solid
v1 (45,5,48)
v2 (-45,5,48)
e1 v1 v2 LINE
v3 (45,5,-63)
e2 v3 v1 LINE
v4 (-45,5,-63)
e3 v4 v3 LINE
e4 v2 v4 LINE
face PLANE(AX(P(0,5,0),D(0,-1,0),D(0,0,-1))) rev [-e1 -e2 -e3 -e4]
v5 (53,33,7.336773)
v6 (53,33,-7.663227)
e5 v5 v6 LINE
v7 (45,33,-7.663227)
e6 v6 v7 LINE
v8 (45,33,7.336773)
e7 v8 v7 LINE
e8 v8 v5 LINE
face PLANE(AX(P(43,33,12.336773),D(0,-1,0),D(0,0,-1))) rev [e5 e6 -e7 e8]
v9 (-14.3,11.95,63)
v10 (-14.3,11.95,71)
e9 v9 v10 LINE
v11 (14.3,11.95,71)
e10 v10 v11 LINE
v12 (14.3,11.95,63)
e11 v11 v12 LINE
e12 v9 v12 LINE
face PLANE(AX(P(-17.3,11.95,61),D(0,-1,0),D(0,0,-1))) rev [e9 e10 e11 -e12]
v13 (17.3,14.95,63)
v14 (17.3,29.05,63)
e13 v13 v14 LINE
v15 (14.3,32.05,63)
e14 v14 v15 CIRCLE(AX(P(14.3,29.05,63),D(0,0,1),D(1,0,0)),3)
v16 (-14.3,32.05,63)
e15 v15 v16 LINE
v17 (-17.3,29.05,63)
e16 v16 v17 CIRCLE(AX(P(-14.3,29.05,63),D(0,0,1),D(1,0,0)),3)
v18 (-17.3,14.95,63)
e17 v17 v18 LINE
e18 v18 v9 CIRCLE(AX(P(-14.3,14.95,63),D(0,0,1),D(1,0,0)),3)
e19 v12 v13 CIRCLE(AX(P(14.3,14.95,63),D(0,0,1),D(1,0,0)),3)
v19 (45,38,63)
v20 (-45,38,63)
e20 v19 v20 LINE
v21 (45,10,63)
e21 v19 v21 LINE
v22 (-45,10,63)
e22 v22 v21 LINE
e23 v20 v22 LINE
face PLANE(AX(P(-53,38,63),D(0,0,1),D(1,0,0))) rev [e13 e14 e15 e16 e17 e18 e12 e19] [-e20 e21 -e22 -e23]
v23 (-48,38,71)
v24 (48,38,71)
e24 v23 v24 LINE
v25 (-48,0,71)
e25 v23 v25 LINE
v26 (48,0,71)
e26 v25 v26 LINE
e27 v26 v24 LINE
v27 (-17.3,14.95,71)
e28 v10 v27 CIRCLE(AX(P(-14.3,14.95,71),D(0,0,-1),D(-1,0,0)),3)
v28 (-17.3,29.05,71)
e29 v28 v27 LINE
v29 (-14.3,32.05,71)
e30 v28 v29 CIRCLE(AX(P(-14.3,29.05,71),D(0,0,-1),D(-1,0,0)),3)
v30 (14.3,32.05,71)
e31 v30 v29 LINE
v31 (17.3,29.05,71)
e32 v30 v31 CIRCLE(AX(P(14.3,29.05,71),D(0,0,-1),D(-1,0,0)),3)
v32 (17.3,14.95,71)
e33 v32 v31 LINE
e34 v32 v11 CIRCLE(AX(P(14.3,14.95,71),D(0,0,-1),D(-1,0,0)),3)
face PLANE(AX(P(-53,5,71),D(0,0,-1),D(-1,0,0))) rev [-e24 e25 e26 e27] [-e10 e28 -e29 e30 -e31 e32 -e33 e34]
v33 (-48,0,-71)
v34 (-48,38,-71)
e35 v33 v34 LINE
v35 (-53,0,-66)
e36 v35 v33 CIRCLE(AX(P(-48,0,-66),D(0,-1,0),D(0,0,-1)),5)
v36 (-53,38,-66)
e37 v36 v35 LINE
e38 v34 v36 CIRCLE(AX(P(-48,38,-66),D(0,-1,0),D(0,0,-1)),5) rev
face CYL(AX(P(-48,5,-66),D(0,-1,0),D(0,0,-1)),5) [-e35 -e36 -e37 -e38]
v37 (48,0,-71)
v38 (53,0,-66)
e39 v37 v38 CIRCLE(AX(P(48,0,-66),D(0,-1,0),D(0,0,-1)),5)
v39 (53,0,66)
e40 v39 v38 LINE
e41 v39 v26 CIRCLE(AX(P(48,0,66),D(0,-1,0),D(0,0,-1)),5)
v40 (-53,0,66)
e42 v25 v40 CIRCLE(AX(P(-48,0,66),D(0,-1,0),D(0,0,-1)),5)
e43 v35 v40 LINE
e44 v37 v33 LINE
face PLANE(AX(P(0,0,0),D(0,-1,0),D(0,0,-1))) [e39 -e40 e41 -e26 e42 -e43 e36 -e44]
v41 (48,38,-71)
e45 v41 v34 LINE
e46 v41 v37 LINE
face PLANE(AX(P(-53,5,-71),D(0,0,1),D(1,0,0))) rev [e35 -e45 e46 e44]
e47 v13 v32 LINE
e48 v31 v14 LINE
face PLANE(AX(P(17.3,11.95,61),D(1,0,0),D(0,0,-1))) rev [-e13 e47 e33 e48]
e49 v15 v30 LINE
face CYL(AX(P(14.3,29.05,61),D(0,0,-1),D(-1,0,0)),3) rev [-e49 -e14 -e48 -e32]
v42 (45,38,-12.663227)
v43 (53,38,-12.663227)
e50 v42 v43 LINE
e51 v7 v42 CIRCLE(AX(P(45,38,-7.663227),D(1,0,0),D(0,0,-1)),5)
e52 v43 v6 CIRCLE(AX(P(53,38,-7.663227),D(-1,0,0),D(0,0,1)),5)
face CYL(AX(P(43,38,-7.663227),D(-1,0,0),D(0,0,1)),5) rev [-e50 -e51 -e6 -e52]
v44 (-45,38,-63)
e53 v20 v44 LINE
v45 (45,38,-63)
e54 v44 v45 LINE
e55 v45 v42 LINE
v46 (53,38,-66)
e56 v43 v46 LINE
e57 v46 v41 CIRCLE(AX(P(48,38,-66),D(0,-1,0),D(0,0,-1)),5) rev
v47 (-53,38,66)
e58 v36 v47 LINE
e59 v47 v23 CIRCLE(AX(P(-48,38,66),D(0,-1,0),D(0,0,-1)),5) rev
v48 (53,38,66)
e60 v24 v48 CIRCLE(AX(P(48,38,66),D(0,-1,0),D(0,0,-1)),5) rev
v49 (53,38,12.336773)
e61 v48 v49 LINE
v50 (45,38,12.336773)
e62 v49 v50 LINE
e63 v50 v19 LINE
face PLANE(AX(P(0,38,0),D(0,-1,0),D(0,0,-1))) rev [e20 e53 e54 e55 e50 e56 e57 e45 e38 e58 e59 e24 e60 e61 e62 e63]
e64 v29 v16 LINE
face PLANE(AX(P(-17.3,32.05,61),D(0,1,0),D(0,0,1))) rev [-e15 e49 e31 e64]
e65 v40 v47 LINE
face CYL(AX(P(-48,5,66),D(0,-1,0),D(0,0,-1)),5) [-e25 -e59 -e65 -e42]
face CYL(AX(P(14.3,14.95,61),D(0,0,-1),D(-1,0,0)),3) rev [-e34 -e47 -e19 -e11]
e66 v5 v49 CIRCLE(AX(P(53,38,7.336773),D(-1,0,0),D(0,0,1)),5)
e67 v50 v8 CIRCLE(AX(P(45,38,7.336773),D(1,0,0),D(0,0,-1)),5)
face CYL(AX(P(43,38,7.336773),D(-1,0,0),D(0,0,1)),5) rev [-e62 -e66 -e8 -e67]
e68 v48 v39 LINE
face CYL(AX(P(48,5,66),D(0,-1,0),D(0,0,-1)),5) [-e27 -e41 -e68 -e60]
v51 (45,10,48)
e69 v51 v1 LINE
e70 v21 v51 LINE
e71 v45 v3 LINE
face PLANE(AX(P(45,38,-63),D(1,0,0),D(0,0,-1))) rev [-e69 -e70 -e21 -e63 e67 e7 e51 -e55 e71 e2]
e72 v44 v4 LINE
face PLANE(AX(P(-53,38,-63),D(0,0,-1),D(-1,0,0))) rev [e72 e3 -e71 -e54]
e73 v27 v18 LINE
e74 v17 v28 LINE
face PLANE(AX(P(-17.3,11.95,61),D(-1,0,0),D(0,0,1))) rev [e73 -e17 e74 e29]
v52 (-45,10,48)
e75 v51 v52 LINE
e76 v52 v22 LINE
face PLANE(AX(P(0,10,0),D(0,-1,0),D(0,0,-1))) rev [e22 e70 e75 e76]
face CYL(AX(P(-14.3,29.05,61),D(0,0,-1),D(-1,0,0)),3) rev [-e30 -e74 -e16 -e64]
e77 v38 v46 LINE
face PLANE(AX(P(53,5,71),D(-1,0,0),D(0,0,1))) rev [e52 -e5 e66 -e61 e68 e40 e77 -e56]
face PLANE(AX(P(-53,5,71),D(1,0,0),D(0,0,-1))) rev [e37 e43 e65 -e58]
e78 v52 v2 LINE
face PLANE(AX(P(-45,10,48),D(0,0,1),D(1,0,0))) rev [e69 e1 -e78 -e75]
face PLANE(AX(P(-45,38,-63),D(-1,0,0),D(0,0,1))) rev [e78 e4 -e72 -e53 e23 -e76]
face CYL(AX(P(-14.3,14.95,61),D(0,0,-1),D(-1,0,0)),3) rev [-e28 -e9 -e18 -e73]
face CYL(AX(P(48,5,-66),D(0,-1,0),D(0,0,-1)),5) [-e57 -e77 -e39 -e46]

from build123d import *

# Parameters (mm, degrees)
SKETCH1_W           = 106
SKETCH1_H           = 142
BOSS_EXTRUDE1_DEPTH = 5
SKETCH2_W           = 106
SKETCH2_H           = 8
BOSS_EXTRUDE2_DEPTH = 33
SKETCH3_W           = 106
SKETCH3_H           = 8
BOSS_EXTRUDE3_DEPTH = 33
SKETCH4_W           = 8
SKETCH4_H           = 126
BOSS_EXTRUDE4_DEPTH = 33
SKETCH5_W           = 90
SKETCH5_H           = 15
BOSS_EXTRUDE5_DEPTH = 5
SKETCH6_W           = 34.6
SKETCH6_H           = 20.1
CUT_EXTRUDE1_DEPTH  = 10
FILLET1_R           = 3
FILLET2_R           = 5
SKETCH8_W           = 25
SKETCH8_H           = 5
CUT_EXTRUDE2_DEPTH  = 10
FILLET3_R           = 5


with BuildPart() as part:
    # Sketch1 → Boss-Extrude1 (new body)
    with BuildSketch(Plane(origin=(0, 0, 0), x_dir=(1, 0, 0), z_dir=(0, 1, 0))):
        Rectangle(SKETCH1_W, SKETCH1_H)
    extrude(amount=BOSS_EXTRUDE1_DEPTH)

    # Sketch2 → Boss-Extrude2 (add)
    with BuildSketch(Plane(origin=(0, 5, 0), x_dir=(1, 0, 0), z_dir=(0, 1, 0))):
        with Locations((0, -67)):
            Rectangle(SKETCH2_W, SKETCH2_H)
    extrude(amount=BOSS_EXTRUDE2_DEPTH)

    # Sketch3 → Boss-Extrude3 (add)
    with BuildSketch(Plane(origin=(0, 5, 0), x_dir=(1, 0, 0), z_dir=(0, 1, 0))):
        with Locations((0, 67)):
            Rectangle(SKETCH3_W, SKETCH3_H)
    extrude(amount=BOSS_EXTRUDE3_DEPTH)

    # Sketch4 → Boss-Extrude4 (add)
    with BuildSketch(Plane(origin=(0, 5, 0), x_dir=(1, 0, 0), z_dir=(0, 1, 0))):
        with Locations((-49, 0)):
            Rectangle(SKETCH4_W, SKETCH4_H)
        with Locations((49, 0)):
            Rectangle(SKETCH4_W, SKETCH4_H)
    extrude(amount=BOSS_EXTRUDE4_DEPTH)

    # Sketch5 → Boss-Extrude5 (add)
    with BuildSketch(Plane(origin=(0, 5, 0), x_dir=(1, 0, 0), z_dir=(0, 1, 0))):
        with Locations((0, -55.5)):
            Rectangle(SKETCH5_W, SKETCH5_H)
    extrude(amount=BOSS_EXTRUDE5_DEPTH)

    # Sketch6 → Cut-Extrude1 (cut)
    with BuildSketch(Plane.XY.offset(71)):
        with Locations((0, 22)):
            Rectangle(SKETCH6_W, SKETCH6_H)
    extrude(amount=-CUT_EXTRUDE1_DEPTH, mode=Mode.SUBTRACT)

    # Fillet1
    fillet1_edges = [part.edges().sort_by_distance(p)[0] for p in [
        (17.3, 32.05, 67),
        (17.3, 11.95, 67),
        (-17.3, 11.95, 67),
        (-17.3, 32.05, 67),
    ]]
    fillet(fillet1_edges, radius=FILLET1_R)

    # Fillet2
    fillet2_edges = [part.edges().sort_by_distance(p)[0] for p in [
        (53, 19, 71),
        (-53, 19, 71),
        (-53, 19, -71),
        (53, 19, -71),
    ]]
    fillet(fillet2_edges, radius=FILLET2_R)

    # Sketch8 → Cut-Extrude2 (cut)
    with BuildSketch(Plane(origin=(53, 0, 0), x_dir=(0, 0, -1), z_dir=(1, 0, 0))):
        with Locations((0.163227162, 35.5)):
            Rectangle(SKETCH8_W, SKETCH8_H)
    extrude(amount=-CUT_EXTRUDE2_DEPTH, mode=Mode.SUBTRACT)

    # Fillet3
    fillet3_edges = [part.edges().sort_by_distance(p)[0] for p in [
        (49, 33, 12.336772838),
        (49, 33, -12.663227162),
    ]]
    fillet(fillet3_edges, radius=FILLET3_R - 0.0001)  # a hair under: the kernel refuses the full size


solid = part.part
